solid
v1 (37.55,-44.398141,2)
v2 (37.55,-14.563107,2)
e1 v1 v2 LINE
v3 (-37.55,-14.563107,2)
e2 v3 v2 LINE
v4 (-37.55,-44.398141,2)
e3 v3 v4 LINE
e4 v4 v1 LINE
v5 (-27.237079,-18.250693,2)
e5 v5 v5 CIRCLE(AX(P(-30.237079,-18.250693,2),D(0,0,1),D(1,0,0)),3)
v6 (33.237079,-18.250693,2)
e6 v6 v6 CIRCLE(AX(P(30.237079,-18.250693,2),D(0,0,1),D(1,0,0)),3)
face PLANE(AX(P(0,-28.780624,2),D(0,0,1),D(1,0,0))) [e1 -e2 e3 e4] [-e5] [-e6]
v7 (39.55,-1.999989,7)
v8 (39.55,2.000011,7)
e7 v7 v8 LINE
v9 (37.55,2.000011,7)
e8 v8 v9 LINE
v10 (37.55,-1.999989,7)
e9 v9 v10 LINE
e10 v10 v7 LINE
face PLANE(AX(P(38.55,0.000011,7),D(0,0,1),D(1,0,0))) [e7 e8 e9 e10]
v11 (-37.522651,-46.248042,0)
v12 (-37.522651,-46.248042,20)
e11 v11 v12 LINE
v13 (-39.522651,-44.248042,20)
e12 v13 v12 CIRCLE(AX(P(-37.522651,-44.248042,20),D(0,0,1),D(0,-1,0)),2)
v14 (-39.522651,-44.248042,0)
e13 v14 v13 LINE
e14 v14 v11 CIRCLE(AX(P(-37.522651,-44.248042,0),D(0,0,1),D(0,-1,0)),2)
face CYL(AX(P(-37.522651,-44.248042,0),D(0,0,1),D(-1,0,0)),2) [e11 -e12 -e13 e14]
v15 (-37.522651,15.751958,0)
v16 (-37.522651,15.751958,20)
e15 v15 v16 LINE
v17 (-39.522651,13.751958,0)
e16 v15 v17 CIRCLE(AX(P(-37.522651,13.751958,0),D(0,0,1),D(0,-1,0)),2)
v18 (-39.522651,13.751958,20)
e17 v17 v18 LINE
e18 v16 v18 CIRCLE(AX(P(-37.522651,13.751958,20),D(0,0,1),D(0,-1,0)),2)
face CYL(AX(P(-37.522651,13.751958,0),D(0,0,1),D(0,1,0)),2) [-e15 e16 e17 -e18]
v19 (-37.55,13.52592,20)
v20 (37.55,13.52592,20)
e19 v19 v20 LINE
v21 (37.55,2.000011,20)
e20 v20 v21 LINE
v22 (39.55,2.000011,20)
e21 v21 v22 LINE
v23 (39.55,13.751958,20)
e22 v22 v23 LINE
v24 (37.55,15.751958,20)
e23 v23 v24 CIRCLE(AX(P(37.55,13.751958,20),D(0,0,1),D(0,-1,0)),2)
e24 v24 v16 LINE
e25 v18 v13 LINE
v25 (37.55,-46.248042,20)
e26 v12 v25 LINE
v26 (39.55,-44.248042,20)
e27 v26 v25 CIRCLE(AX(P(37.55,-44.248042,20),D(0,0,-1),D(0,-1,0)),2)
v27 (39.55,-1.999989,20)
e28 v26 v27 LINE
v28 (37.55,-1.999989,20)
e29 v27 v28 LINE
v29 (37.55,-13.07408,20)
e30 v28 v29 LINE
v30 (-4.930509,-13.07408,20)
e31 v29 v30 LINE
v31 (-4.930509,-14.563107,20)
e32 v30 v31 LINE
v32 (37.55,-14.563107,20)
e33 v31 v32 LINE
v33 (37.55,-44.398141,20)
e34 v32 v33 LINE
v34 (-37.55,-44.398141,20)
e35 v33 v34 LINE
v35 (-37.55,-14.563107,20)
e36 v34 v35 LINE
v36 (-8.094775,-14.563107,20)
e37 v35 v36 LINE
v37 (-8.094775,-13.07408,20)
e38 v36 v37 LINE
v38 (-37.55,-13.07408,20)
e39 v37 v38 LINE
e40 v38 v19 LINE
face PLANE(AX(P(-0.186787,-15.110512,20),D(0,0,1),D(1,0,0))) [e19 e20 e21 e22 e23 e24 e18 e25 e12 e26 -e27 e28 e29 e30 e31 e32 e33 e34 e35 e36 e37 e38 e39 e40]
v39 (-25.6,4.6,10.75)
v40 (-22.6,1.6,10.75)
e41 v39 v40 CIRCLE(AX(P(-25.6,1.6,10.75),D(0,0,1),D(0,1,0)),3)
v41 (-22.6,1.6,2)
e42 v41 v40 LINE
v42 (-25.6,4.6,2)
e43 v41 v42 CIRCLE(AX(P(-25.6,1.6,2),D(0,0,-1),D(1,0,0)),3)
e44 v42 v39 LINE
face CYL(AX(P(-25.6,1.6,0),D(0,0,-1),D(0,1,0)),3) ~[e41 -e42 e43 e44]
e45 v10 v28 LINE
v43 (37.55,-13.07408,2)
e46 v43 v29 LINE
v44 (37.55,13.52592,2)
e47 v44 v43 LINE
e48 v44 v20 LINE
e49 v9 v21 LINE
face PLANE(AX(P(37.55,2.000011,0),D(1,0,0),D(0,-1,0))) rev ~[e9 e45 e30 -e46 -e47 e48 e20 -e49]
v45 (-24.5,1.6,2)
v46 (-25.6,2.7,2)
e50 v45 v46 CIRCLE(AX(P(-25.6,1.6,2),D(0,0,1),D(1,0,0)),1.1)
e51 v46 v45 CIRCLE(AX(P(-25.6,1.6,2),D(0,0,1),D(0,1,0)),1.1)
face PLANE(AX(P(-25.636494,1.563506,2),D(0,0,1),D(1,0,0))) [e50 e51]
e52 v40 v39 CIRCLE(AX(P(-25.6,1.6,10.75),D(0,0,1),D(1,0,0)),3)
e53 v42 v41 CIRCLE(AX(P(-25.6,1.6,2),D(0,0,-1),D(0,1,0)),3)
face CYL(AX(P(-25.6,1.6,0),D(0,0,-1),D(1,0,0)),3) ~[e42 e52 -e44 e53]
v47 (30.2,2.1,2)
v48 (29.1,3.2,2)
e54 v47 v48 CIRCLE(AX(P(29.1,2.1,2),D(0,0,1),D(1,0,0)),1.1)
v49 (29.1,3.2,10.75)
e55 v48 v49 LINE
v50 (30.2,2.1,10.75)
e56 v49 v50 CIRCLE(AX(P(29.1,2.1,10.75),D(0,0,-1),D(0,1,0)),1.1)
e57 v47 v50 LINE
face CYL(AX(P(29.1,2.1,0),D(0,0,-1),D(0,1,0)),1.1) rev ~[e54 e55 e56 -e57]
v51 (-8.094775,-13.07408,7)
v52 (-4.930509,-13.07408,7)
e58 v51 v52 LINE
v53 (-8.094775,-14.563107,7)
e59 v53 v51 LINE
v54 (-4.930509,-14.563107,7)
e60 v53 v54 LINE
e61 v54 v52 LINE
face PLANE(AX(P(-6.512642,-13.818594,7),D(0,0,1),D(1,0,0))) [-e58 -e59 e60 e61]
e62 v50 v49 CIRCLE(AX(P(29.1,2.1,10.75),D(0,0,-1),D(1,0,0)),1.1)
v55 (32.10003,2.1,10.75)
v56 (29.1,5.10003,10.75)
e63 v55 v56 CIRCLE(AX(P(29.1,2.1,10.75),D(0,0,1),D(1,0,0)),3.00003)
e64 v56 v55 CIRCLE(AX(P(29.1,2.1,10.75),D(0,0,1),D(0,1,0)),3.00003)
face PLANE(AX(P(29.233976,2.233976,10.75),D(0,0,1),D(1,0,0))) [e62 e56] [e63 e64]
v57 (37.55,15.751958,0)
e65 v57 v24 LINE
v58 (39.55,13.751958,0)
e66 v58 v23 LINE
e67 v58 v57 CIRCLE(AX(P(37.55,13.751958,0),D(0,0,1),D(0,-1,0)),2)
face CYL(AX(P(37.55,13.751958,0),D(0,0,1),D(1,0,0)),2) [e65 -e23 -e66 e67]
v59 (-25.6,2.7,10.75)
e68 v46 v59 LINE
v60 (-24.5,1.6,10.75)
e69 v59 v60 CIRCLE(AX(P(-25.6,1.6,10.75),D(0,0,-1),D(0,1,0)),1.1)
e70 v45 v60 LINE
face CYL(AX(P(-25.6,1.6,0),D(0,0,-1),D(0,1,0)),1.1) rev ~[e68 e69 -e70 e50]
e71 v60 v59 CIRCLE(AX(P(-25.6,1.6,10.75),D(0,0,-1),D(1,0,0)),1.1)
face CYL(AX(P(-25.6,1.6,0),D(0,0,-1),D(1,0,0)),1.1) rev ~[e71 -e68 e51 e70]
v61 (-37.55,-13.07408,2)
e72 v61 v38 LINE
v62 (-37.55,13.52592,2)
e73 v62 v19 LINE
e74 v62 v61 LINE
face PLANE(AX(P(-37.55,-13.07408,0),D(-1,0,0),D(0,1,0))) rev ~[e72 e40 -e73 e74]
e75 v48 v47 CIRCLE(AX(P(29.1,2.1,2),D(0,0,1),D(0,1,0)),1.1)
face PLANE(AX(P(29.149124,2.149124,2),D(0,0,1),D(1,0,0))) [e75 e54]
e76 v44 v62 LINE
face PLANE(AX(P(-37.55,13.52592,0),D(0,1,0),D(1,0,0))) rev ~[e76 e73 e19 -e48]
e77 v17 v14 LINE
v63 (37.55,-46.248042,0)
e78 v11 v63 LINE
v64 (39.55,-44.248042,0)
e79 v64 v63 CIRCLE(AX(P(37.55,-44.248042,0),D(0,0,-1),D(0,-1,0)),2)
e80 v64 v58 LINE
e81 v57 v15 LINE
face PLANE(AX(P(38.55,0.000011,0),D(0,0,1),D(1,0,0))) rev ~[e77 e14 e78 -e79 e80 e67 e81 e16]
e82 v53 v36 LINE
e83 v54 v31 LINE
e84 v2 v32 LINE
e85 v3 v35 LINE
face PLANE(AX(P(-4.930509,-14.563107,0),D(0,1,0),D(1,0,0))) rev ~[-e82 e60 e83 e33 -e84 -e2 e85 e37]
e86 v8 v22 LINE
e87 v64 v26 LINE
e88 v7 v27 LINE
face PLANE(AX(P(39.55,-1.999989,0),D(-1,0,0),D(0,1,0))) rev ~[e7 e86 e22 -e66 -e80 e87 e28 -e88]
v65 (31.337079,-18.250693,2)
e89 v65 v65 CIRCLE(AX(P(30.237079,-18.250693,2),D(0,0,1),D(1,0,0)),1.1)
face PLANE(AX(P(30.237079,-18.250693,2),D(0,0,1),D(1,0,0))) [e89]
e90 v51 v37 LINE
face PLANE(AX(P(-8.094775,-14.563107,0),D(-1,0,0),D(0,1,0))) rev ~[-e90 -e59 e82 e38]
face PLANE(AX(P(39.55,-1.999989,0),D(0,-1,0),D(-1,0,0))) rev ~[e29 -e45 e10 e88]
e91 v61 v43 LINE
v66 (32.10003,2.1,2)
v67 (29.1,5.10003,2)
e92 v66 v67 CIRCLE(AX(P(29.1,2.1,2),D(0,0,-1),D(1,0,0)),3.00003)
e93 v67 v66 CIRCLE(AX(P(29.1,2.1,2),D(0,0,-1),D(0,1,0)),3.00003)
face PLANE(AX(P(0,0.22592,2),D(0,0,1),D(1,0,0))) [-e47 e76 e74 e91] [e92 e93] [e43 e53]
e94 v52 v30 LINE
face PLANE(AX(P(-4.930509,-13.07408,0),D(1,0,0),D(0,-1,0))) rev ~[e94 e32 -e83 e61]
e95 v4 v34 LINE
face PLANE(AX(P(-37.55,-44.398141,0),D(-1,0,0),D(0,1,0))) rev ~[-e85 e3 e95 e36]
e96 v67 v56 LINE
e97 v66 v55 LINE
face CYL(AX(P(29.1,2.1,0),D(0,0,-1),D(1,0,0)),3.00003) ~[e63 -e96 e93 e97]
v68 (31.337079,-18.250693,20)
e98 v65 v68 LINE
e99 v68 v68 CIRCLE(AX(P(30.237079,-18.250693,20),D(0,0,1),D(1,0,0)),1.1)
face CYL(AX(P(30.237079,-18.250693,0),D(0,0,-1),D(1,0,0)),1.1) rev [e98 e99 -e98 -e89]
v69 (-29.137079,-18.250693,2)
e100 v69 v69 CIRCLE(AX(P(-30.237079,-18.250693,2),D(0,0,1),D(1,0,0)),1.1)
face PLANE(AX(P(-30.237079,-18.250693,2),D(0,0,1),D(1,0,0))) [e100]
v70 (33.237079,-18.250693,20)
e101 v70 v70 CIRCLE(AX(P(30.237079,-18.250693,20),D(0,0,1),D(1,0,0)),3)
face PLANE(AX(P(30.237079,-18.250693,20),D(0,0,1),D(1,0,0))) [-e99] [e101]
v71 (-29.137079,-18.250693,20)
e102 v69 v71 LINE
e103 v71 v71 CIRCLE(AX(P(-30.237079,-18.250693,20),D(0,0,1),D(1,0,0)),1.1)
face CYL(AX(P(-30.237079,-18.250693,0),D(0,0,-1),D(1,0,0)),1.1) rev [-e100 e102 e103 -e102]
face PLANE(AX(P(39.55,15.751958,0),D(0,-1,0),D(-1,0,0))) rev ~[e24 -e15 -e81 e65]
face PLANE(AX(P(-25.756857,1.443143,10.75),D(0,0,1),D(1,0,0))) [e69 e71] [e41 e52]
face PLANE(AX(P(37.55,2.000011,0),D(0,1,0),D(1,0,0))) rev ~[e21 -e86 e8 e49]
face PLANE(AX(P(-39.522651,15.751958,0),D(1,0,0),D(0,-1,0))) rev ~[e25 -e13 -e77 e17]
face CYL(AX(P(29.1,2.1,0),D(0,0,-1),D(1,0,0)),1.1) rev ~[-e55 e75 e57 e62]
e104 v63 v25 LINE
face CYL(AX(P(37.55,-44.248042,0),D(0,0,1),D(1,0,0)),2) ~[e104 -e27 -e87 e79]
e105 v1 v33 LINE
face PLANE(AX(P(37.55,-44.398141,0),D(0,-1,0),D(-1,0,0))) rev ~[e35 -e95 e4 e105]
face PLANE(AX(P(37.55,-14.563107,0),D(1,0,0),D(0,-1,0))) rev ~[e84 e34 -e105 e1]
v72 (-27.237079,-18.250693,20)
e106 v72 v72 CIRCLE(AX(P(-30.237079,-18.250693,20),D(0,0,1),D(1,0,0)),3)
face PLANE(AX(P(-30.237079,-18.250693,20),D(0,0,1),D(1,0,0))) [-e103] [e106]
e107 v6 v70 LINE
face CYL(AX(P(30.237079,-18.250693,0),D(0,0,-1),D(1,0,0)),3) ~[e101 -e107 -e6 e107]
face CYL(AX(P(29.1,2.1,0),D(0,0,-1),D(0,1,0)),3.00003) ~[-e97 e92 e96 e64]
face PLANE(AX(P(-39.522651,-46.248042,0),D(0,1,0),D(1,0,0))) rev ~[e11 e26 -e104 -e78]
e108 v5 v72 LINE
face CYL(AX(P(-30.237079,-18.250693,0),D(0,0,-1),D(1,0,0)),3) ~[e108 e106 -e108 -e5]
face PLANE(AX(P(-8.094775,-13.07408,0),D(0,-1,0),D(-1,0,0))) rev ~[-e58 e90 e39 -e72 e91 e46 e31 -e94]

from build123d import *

# Parameters (mm, degrees)
F1_DEPTH = 20
F0_R     = 3
F0_R_2   = 1.1
F2_DEPTH = 2
F3_DEPTH = 10.75
F0_W     = 3.1642657705
F0_H     = 1.4890261218
F4_DEPTH = 7
F5_R     = 2


# Not quite as in the source:
# - a feature names something its author has since deleted; it is built from what else it names


with BuildPart() as f1:
    # F0 (on Top) → F1 (new body)
    with BuildSketch(Plane.XY):
        Polygon((-37.55, -13.0740804598), (-37.55, -12.1), (-37.55, 13.5259195402), (37.55, 13.5259195402), (37.55, 2.0000108369), (39.55, 2.0000108369), (39.55, 15.7519578086), (-39.5226512551, 15.7519578086), (-39.5226512551, -46.2480421914), (39.55, -46.2480421914), (39.55, -1.9999891631), (37.55, -1.9999891631), (37.55, -13.0740804598), (-4.9305087887, -13.0740804598), (-4.9305087887, -14.5631065816), (36.1, -14.5631065816), (37.55, -14.5631065816), (37.55, -44.3981406778), (-37.55, -44.3981406778), (-37.55, -14.5631065816), (-36.1, -14.5631065816), (-8.0947745591, -14.5631065816), (-8.0947745591, -13.0740804598), align=None)
    extrude(amount=F1_DEPTH)



with BuildPart() as f1b:
    # F0 (on Top) → F1, piece 2 (new body)
    with BuildSketch(Plane.XY):
        with Locations((-30.2370786667, -18.2506926358)):
            Circle(F0_R)
        with Locations((-30.2370786667, -18.2506926358)):
            Circle(F0_R_2, mode=Mode.SUBTRACT)
    extrude(amount=F1_DEPTH)


with BuildPart() as f1c:
    # F0 (on Top) → F1, piece 3 (new body)
    with BuildSketch(Plane.XY):
        with Locations((30.2370786667, -18.2506926358)):
            Circle(F0_R)
        with Locations((30.2370786667, -18.2506926358)):
            Circle(F0_R_2, mode=Mode.SUBTRACT)
    extrude(amount=F1_DEPTH)


with BuildPart() as f2:
    # F0 (on Top) → F2 (new body)
    with BuildSketch(Plane.XY):
        with BuildLine():
            Line((-25.6, 1.6), (-25.6, 2.7))
            ThreePointArc((-25.6, 2.7), (-26.3778174593, 0.8221825407), (-24.5, 1.6))
            Line((-24.5, 1.6), (-25.6, 1.6))
        make_face()
        with BuildLine():
            ThreePointArc((-24.5, 1.6), (-24.8221825407, 2.3778174593), (-25.6, 2.7))
            Line((-25.6, 2.7), (-25.6, 1.6))
            Line((-25.6, 1.6), (-24.5, 1.6))
        make_face()
    extrude(amount=F2_DEPTH)


with BuildPart() as f2b:
    # F0 (on Top) → F2, piece 2 (new body)
    with BuildSketch(Plane.XY):
        with BuildLine():
            ThreePointArc((30.2, 2.1), (29.8778174593, 2.8778174593), (29.1, 3.2))
            ThreePointArc((29.1, 3.2), (28.3221825407, 1.3221825407), (30.2, 2.1))
        make_face()
    extrude(amount=F2_DEPTH)


with BuildPart() as f1_1:
    add(f1.part)

    add(f1b.part)  # F2#3 merges F1b

    add(f1c.part)  # F2#3 merges F1c
    # F0 (on Top) → F2, piece 3 (join)
    with BuildSketch(Plane.XY):
        Polygon((-4.9305087887, -14.5631065816), (-8.0947745591, -14.5631065816), (-36.1, -14.5631065816), (-36.1, -42.9981406778), (36.1, -42.9981406778), (36.1, -14.5631065816), align=None)
        with Locations((-30.2370786667, -18.2506926358)):
            Circle(F0_R, mode=Mode.SUBTRACT)
        with Locations((30.2370786667, -18.2506926358)):
            Circle(F0_R, mode=Mode.SUBTRACT)
        Polygon((-37.55, 13.5259195402), (-37.55, -12.1), (-37.55, -13.0740804598), (-8.0947745591, -13.0740804598), (-4.9305087887, -13.0740804598), (37.55, -13.0740804598), (37.55, -1.9999891631), (37.55, 2.0000108369), (37.55, 13.5259195402), align=None)
        Polygon((36.1, 12.1), (36.1, -12.1), (-36.1, -12.1), (-36.1, 12.1), (-25.6, 12.1), (29.1, 12.1), align=None, mode=Mode.SUBTRACT)
        Polygon((-36.1, -12.1), (36.1, -12.1), (36.1, 12.1), (29.1, 12.1), (-25.6, 12.1), (-36.1, 12.1), align=None)
        with BuildLine():
            ThreePointArc((-22.6, 1.6), (-27.7213203436, -0.5213203436), (-25.6, 4.6))
            ThreePointArc((-25.6, 4.6), (-23.4786796564, 3.7213203436), (-22.6, 1.6))
        make_face(mode=Mode.SUBTRACT)
        with BuildLine():
            ThreePointArc((32.1000297599, 2.1), (26.978658613, -0.021341387), (29.1, 5.1000297599))
            ThreePointArc((29.1, 5.1000297599), (31.221341387, 4.221341387), (32.1000297599, 2.1))
        make_face(mode=Mode.SUBTRACT)
        Polygon((-36.1, -42.9981406778), (-36.1, -14.5631065816), (-37.55, -14.5631065816), (-37.55, -44.3981406778), (37.55, -44.3981406778), (37.55, -14.5631065816), (36.1, -14.5631065816), (36.1, -42.9981406778), align=None)
        with Locations((-30.2370786667, -18.2506926358)):
            Circle(F0_R_2)
        with Locations((30.2370786667, -18.2506926358)):
            Circle(F0_R_2)
    extrude(amount=F2_DEPTH)


    add(f2.part)  # F3 merges F2

    add(f2b.part)  # F3 merges F2b
    # F0 (on Top) → F3 (join)
    with BuildSketch(Plane.XY):
        with BuildLine():
            Line((-25.6, 2.7), (-25.6, 4.6))
            ThreePointArc((-25.6, 4.6), (-27.7213203436, -0.5213203436), (-22.6, 1.6))
            Line((-22.6, 1.6), (-24.5, 1.6))
            ThreePointArc((-24.5, 1.6), (-26.3778174593, 0.8221825407), (-25.6, 2.7))
        make_face()
        with BuildLine():
            ThreePointArc((-22.6, 1.6), (-23.4786796564, 3.7213203436), (-25.6, 4.6))
            Line((-25.6, 4.6), (-25.6, 2.7))
            ThreePointArc((-25.6, 2.7), (-24.8221825407, 2.3778174593), (-24.5, 1.6))
            Line((-24.5, 1.6), (-22.6, 1.6))
        make_face()
        with BuildLine():
            ThreePointArc((32.1000297599, 2.1), (31.221341387, 4.221341387), (29.1, 5.1000297599))
            ThreePointArc((29.1, 5.1000297599), (26.978658613, -0.021341387), (32.1000297599, 2.1))
        make_face()
        with BuildLine():
            ThreePointArc((30.2, 2.1), (28.3221825407, 1.3221825407), (29.1, 3.2))
            ThreePointArc((29.1, 3.2), (29.8778174593, 2.8778174593), (30.2, 2.1))
        make_face(mode=Mode.SUBTRACT)
    extrude(amount=F3_DEPTH)

    # F0 (on Top) → F4 (join)
    with BuildSketch(Plane.XY):
        Polygon((39.55, 2.0000108369), (37.55, 2.0000108369), (37.55, -1.9999891631), (39.55, -1.9999891631), (39.55, 1.08369e-05), align=None)
        with Locations((-6.5126416739, -13.8185935207)):
            Rectangle(F0_W, F0_H)
    extrude(amount=F4_DEPTH)

    # F5
    f5_edges = [f1_1.edges().sort_by_distance(p)[0] for p in [
        (39.55, -46.248042, 10),
        (39.55, 15.751958, 10),
        (-39.522651, 15.751958, 10),
        (-39.522651, -46.248042, 10),
    ]]
    fillet(f5_edges, radius=F5_R)


solid = f1_1.part
